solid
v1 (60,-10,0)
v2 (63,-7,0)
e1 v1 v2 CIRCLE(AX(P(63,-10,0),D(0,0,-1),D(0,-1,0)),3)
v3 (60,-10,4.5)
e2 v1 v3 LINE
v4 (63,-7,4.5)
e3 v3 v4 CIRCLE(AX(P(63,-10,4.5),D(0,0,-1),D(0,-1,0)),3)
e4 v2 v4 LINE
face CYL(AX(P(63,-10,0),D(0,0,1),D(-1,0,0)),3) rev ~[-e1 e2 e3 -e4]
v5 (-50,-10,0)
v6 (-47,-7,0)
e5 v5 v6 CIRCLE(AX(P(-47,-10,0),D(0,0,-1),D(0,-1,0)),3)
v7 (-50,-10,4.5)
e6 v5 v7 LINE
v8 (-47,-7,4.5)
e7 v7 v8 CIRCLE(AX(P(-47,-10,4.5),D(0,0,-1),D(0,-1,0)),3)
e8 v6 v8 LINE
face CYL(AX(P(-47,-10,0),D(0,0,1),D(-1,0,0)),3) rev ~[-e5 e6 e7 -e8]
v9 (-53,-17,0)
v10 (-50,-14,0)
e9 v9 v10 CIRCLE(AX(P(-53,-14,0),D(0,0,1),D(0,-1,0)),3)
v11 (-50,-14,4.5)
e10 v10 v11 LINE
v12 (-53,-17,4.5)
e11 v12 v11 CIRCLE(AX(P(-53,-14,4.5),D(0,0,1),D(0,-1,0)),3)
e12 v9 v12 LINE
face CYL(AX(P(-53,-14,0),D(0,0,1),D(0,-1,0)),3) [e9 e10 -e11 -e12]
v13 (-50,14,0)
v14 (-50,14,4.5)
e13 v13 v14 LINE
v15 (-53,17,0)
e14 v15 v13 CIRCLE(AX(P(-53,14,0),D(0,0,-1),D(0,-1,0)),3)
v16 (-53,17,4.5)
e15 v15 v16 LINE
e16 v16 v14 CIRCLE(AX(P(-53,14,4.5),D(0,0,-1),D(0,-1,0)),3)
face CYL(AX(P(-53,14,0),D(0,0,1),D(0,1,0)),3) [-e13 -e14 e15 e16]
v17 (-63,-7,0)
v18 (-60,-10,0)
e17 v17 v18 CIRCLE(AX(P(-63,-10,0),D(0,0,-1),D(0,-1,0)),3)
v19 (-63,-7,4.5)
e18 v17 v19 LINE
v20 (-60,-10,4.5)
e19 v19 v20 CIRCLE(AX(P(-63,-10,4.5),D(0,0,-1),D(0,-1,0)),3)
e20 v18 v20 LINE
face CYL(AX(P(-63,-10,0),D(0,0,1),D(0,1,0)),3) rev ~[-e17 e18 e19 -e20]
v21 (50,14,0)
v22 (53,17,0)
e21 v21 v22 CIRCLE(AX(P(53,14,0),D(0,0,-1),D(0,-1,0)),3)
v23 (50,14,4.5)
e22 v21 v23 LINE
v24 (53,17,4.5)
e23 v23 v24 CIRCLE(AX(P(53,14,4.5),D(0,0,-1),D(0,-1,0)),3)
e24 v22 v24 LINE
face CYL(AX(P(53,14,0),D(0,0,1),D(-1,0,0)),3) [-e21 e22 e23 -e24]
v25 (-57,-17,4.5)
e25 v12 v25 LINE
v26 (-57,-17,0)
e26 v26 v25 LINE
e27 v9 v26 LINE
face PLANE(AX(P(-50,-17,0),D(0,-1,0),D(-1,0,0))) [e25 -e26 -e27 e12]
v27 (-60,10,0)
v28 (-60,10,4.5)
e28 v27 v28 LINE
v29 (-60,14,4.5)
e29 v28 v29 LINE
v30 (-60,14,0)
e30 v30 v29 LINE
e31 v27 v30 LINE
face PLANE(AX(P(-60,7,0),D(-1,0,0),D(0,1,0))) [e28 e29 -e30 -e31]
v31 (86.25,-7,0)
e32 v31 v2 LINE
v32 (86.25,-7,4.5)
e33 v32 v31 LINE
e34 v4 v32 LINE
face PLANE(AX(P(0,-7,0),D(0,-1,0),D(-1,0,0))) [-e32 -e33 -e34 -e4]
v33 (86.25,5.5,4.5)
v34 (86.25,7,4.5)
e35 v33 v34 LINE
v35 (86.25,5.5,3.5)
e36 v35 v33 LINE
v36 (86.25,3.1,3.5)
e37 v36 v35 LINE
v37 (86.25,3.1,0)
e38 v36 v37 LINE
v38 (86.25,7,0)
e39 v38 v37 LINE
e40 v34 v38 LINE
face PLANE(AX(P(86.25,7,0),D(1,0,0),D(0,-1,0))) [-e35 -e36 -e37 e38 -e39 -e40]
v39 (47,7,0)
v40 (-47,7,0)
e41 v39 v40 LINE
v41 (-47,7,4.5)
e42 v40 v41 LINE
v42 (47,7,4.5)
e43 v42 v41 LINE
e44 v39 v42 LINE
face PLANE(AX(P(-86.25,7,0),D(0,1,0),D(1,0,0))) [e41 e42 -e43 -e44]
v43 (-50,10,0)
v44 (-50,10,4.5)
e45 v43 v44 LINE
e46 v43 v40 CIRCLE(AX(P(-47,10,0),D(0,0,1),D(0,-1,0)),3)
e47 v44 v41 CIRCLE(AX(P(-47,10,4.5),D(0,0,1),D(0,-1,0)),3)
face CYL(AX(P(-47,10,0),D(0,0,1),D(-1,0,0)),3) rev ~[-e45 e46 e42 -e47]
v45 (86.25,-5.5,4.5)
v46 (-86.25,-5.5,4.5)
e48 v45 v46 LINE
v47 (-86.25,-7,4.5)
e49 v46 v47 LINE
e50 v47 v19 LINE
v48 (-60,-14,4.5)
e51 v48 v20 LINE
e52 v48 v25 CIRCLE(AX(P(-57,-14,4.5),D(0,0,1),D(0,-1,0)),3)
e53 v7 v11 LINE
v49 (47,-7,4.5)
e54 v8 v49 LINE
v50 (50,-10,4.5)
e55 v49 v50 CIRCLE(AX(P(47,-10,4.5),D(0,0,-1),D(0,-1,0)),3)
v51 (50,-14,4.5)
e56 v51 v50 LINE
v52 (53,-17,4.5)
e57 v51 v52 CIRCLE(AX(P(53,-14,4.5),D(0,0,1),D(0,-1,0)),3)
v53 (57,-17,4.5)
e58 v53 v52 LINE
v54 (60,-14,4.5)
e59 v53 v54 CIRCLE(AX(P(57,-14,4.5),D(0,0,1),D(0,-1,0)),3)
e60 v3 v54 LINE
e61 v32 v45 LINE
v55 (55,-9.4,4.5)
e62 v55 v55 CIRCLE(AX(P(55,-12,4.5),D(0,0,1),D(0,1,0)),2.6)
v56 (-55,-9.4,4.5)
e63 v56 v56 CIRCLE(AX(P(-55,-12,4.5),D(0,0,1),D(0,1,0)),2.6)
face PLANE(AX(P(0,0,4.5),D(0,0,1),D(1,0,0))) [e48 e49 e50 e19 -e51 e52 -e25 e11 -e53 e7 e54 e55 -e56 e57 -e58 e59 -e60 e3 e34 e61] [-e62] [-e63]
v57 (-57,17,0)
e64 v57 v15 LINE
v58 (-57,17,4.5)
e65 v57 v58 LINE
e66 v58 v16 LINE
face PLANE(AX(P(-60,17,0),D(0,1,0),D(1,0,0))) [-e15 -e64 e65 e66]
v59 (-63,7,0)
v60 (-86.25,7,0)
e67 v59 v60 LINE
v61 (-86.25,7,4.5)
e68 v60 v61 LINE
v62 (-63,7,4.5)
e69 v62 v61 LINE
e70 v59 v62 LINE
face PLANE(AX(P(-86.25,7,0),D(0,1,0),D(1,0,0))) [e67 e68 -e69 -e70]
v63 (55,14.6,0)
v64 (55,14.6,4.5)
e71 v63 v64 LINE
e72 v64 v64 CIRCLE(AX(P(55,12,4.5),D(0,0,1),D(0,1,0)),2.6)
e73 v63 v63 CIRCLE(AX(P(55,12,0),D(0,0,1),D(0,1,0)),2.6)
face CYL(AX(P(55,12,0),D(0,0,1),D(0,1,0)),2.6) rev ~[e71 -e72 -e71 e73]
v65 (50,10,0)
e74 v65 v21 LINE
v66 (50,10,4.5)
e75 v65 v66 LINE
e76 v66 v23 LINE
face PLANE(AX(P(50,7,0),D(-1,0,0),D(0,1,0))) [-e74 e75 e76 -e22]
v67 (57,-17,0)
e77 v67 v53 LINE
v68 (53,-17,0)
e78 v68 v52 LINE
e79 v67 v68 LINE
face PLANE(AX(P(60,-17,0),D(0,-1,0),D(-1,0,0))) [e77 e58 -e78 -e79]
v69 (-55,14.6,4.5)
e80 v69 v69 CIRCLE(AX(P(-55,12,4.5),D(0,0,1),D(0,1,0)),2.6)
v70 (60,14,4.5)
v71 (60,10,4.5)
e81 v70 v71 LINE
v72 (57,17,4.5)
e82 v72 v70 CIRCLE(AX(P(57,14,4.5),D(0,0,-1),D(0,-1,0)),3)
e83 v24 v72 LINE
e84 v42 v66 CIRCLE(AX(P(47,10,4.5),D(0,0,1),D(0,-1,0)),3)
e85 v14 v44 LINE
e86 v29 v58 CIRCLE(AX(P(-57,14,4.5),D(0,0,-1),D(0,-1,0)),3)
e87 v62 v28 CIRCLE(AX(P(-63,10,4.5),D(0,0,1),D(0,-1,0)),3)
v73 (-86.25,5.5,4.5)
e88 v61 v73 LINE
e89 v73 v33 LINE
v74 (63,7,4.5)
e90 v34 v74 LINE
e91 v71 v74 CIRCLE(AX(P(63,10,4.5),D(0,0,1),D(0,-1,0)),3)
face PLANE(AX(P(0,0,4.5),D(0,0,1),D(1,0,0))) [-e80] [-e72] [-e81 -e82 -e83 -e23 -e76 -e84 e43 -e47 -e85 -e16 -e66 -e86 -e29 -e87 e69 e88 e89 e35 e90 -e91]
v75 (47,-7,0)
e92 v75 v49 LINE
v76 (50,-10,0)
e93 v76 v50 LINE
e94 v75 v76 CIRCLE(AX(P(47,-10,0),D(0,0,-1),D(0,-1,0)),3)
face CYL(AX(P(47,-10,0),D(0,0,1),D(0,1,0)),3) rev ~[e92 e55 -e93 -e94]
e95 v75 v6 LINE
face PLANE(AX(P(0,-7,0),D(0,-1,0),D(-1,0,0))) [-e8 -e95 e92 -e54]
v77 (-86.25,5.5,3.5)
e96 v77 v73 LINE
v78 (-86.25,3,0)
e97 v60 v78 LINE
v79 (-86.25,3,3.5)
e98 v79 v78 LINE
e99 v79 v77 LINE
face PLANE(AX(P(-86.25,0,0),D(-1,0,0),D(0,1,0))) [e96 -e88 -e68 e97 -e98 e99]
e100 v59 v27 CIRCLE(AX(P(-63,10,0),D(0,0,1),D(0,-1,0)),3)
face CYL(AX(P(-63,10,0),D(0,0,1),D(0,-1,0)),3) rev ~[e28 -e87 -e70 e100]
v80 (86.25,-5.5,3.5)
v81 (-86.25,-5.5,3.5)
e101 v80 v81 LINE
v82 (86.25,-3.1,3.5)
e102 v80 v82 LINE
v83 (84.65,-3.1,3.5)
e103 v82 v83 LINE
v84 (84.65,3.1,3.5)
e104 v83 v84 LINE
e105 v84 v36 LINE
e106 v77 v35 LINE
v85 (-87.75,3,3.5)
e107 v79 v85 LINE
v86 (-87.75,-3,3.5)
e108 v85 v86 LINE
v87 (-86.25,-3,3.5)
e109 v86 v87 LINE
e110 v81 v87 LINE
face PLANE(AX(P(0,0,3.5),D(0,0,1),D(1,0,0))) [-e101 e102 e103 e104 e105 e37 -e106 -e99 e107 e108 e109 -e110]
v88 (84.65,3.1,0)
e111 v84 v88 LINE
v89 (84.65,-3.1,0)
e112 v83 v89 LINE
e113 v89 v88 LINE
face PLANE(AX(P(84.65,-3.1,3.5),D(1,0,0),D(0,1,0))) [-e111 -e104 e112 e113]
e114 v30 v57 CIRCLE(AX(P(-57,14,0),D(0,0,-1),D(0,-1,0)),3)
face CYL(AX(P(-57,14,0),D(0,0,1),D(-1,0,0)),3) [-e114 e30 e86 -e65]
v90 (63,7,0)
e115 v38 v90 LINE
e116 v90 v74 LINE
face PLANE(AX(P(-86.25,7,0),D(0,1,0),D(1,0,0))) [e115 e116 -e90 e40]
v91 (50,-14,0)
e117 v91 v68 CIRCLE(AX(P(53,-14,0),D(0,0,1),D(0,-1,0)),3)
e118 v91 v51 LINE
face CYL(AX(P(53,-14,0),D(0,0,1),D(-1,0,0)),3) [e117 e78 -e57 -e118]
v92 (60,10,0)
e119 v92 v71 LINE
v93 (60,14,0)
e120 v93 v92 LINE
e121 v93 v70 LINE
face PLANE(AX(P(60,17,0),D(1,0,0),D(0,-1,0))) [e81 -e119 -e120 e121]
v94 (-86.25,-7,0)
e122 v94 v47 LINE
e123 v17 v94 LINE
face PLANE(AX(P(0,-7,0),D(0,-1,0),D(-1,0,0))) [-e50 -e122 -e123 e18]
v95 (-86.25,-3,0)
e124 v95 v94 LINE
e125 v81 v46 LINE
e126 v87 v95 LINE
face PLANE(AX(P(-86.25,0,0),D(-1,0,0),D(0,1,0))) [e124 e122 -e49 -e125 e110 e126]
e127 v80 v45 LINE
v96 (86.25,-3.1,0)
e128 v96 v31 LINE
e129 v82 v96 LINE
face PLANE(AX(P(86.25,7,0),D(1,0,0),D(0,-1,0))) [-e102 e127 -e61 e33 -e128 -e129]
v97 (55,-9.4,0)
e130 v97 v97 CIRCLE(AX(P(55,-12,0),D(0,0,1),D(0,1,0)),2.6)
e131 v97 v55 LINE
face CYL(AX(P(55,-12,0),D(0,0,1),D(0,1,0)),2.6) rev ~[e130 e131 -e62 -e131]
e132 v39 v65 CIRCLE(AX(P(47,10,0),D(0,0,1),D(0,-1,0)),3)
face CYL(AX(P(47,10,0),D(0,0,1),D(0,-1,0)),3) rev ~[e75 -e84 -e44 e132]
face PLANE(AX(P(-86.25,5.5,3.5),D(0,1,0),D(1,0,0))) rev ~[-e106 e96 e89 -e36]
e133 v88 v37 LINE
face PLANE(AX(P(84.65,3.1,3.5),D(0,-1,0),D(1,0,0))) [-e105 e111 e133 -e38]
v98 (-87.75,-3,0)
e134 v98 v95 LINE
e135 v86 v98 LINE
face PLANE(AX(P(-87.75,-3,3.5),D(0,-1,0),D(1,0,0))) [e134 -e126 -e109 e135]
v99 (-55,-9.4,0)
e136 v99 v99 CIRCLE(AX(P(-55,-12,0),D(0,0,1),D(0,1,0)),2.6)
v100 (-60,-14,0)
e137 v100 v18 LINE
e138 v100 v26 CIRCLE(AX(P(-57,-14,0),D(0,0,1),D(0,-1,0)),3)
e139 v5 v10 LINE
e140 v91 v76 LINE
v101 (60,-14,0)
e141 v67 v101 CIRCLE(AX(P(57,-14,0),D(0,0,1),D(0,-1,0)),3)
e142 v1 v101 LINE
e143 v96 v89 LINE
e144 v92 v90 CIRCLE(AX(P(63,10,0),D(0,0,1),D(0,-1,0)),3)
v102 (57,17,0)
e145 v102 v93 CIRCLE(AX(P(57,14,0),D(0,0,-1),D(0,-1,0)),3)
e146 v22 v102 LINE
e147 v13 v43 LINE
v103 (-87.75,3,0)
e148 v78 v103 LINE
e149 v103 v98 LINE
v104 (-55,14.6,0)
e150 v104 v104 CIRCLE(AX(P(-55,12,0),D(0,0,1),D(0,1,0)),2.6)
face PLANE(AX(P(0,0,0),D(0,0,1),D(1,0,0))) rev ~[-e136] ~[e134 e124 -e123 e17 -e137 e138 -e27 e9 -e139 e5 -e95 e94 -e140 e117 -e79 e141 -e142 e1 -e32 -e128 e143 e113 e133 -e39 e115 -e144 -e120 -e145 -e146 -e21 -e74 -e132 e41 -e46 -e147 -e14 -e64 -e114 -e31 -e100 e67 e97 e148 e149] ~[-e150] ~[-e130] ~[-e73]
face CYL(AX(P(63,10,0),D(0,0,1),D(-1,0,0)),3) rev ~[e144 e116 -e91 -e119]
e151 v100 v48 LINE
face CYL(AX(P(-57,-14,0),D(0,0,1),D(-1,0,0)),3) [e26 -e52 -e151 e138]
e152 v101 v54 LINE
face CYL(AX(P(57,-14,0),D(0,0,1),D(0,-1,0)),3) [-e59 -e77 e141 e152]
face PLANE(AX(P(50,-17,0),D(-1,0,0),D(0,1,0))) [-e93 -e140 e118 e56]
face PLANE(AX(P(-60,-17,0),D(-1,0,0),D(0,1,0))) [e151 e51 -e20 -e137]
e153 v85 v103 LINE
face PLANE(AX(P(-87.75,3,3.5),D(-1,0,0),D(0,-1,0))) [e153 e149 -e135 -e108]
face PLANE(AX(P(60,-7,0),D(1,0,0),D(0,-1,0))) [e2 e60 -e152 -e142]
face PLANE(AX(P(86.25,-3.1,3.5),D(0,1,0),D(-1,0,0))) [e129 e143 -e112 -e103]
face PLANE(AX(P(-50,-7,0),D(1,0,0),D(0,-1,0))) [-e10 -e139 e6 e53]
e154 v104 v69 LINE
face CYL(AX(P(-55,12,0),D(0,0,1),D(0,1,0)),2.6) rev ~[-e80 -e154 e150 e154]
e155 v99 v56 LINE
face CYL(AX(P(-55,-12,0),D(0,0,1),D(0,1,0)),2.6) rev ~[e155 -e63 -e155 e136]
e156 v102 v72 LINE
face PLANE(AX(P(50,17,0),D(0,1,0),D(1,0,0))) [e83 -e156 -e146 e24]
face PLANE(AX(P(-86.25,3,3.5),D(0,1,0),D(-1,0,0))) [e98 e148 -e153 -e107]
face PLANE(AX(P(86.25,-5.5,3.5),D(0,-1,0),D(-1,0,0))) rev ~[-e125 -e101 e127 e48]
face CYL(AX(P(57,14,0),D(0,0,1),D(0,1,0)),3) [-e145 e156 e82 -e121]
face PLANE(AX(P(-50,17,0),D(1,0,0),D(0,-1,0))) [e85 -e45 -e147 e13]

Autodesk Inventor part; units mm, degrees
ref_plane "YZ Plane" through (0, 0, 0) normal (1, 0, 0) x (0, 1, 0)
ref_plane "XZ Plane" through (0, 0, 0) normal (0, 1, 0) x (-1, 0, 0)
ref_plane "XY Plane" through (0, 0, 0) normal (0, 0, 1) x (1, 0, 0)
sketch "Skizze2" plane through (0, 0, 0) normal (0, 0, 1) x (1, 0, 0)
  line L0 (-86.25, 7) -> (86.25, 7)
  line L1 (86.25, 7) -> (86.25, -7)
  line L2 (86.25, -7) -> (-86.25, -7)
  line L3 (-86.25, -7) -> (-86.25, 7)
  line L4 (0, 9.8) -> (0, -9.8) projected
  line L5 (-120.75, 0) -> (120.75, 0) projected
  point P0 (0, 0)
  point P1 (-86.25, 0)
  point P2 (0, 7)
  dimension "d0" = 14
  dimension "d1" = 172.5
extrude "Extrusion1" add sketch "Skizze2" along normal blind 3.5
sketch "Skizze3" plane through (0, 0, 3.5) normal (0, 0, 1) x (1, 0, 0)
  line L0 (86.25, -7) -> (86.25, 7) projected
  line L1 (86.25, 7) -> (-86.25, 7) projected
  line L2 (-86.25, 7) -> (-86.25, -7) projected
  line L3 (-86.25, -7) -> (86.25, -7) projected
  line L4 (86.25, 7) -> (-86.25, 7)
  line L5 (-86.25, 7) -> (-86.25, 5.5)
  line L6 (-86.25, 5.5) -> (86.25, 5.5)
  line L7 (86.25, 5.5) -> (86.25, 7)
  line L8 (-86.25, 7) -> (-86.25, -7) projected
  line L9 (-86.25, -7) -> (86.25, -7)
  line L10 (86.25, -7) -> (86.25, -5.5)
  line L11 (86.25, -5.5) -> (-86.25, -5.5)
  line L12 (-86.25, -5.5) -> (-86.25, -7)
  point P0 (0, 0)
  dimension "d4" = 1.5
  dimension "d5" = 1.5
extrude "Extrusion2" add sketch "Skizze3" along normal blind 1 contours L3 L2 L11 L0 | L6 L2 L1 L0
sketch "Skizze4" plane through (0, 0, 0) normal (0, 0, -1) x (-1, 0, 0)
  line L0 (86.25, -7) -> (-86.25, -7) projected
  line L1 (155.9309, -7) -> (147.0048, -7)
  line L2 (60, -7) -> (50, -7)
  line L3 (50, -7) -> (50, -17)
  line L4 (50, -17) -> (60, -17)
  line L5 (60, -17) -> (60, -7)
  line L6 (50, 7) -> (60, 7)
  line L7 (60, 7) -> (60, 17)
  line L8 (60, 17) -> (50, 17)
  line L9 (50, 17) -> (50, 7)
  line L10 (86.25, -7) -> (-86.25, -7) projected
  line L11 (-86.25, 7) -> (86.25, 7) projected
  line L12 (86.25, 7) -> (86.25, -7) projected
  line L13 (-60, -9.0118) -> (-60, -17) construction
  line L14 (-60, -17) -> (-50, -17) construction
  line L15 (-50, -17) -> (-50, -7) construction
  line L16 (-86.25, -7) -> (-86.25, 7) projected
  point P0 (0, 0)
  point P1 (50, -7)
  point P2 (55, -17)
  point P3 (-55, -17)
  point P4 (55, -12)
  point P5 (55, 12)
  point P6 (60, -12)
  point P7 (60, 12)
  dimension "d8" = 10
  dimension "d9" = 10
  dimension "d30" = 110
  dimension "d31" = 10
  dimension "d32" = 24
  dimension "d33" = 55
extrude "Extrusion3" add sketch "Skizze4" against normal up to surface (4.5 mm away) contours L5 L4 L3 L0 | L6 L9 L8 L7
sketch "Skizze5" plane through (0, 0, 0) normal (0, 0, -1) x (-1, 0, 0)
  line L0 (50, -17) -> (60, -17) projected
  line L1 (50, -7) -> (50, -17) projected
  line L2 (50, 17) -> (50, 7) projected
  point P0 (0, 0)
  point P1 (55, -12)
  point P2 (55, 12)
  point P3 (55, -17)
  point P4 (50, -12)
  point P5 (50, 12)
  dimension "d13" = 24
hole "Bohrung1" at (-55, -12, 0) direction (0, 0, 1) diameter 5.2 end through all
fillet "Rundung1" radius 3 8 edges at (-60, -17, 2.25) (-50, -17, 2.25) (-50, -7, 2.25) (-60, -7, 2.25) (-50, 17, 2.25) (-60, 17, 2.25) (-50, 7, 2.25) (-60, 7, 2.25)
pattern_linear "Rechteckige Anordnung1" count 2 spacing 24 along (0, 1, 0) of "Bohrung1"
pattern_linear "Rechteckige Anordnung2" count 2 spacing 110 along (1, 0, 0) of "Rundung1", "Bohrung1", "Extrusion3", "Rechteckige Anordnung1"
sketch "Skizze7" plane through (0, 0, 3.5) normal (0, 0, 1) x (1, 0, 0)
  line L0 (-86.25, 5.5) -> (-86.25, -5.5) projected
  line L1 (-86.25, 3) -> (-87.75, 3)
  line L2 (-87.75, 3) -> (-87.75, -3)
  line L3 (-87.75, -3) -> (-86.25, -3)
  line L4 (-86.25, -3) -> (-86.25, 3)
  line L5 (86.25, -3.1) -> (84.65, -3.1)
  line L6 (84.65, -3.1) -> (84.65, 3.1)
  line L7 (84.65, 3.1) -> (86.25, 3.1)
  line L8 (86.25, 3.1) -> (86.25, -3.1)
  line L9 (86.25, -5.5) -> (86.25, 5.5) projected
  point P0 (0, 0)
  point P1 (-87.75, 0)
  point P2 (-86.25, 0)
  point P3 (-86.25, 0)
  point P4 (84.65, 0)
  point P5 (86.25, 0)
  point P6 (86.25, 0)
  dimension "d37" = 1.5
  dimension "d38" = 6
  dimension "d41" = 1.6
  dimension "d44" = 6.2
extrude "Extrusion5" add sketch "Skizze7" against normal up to surface (3.5 mm away) contours L0 L3 L2 L1
extrude "Extrusion6" cut sketch "Skizze7" against normal through all contours L5 L6 L7 L8
equation "\"d5\" = d4"
equation "\"d9\" = d8"
equation "\"d33\" = 0.5 * d30"
equation "\"d24\" = d13"
properties part number "LED_Strip_Halter" material "PA 6 schwarz"
